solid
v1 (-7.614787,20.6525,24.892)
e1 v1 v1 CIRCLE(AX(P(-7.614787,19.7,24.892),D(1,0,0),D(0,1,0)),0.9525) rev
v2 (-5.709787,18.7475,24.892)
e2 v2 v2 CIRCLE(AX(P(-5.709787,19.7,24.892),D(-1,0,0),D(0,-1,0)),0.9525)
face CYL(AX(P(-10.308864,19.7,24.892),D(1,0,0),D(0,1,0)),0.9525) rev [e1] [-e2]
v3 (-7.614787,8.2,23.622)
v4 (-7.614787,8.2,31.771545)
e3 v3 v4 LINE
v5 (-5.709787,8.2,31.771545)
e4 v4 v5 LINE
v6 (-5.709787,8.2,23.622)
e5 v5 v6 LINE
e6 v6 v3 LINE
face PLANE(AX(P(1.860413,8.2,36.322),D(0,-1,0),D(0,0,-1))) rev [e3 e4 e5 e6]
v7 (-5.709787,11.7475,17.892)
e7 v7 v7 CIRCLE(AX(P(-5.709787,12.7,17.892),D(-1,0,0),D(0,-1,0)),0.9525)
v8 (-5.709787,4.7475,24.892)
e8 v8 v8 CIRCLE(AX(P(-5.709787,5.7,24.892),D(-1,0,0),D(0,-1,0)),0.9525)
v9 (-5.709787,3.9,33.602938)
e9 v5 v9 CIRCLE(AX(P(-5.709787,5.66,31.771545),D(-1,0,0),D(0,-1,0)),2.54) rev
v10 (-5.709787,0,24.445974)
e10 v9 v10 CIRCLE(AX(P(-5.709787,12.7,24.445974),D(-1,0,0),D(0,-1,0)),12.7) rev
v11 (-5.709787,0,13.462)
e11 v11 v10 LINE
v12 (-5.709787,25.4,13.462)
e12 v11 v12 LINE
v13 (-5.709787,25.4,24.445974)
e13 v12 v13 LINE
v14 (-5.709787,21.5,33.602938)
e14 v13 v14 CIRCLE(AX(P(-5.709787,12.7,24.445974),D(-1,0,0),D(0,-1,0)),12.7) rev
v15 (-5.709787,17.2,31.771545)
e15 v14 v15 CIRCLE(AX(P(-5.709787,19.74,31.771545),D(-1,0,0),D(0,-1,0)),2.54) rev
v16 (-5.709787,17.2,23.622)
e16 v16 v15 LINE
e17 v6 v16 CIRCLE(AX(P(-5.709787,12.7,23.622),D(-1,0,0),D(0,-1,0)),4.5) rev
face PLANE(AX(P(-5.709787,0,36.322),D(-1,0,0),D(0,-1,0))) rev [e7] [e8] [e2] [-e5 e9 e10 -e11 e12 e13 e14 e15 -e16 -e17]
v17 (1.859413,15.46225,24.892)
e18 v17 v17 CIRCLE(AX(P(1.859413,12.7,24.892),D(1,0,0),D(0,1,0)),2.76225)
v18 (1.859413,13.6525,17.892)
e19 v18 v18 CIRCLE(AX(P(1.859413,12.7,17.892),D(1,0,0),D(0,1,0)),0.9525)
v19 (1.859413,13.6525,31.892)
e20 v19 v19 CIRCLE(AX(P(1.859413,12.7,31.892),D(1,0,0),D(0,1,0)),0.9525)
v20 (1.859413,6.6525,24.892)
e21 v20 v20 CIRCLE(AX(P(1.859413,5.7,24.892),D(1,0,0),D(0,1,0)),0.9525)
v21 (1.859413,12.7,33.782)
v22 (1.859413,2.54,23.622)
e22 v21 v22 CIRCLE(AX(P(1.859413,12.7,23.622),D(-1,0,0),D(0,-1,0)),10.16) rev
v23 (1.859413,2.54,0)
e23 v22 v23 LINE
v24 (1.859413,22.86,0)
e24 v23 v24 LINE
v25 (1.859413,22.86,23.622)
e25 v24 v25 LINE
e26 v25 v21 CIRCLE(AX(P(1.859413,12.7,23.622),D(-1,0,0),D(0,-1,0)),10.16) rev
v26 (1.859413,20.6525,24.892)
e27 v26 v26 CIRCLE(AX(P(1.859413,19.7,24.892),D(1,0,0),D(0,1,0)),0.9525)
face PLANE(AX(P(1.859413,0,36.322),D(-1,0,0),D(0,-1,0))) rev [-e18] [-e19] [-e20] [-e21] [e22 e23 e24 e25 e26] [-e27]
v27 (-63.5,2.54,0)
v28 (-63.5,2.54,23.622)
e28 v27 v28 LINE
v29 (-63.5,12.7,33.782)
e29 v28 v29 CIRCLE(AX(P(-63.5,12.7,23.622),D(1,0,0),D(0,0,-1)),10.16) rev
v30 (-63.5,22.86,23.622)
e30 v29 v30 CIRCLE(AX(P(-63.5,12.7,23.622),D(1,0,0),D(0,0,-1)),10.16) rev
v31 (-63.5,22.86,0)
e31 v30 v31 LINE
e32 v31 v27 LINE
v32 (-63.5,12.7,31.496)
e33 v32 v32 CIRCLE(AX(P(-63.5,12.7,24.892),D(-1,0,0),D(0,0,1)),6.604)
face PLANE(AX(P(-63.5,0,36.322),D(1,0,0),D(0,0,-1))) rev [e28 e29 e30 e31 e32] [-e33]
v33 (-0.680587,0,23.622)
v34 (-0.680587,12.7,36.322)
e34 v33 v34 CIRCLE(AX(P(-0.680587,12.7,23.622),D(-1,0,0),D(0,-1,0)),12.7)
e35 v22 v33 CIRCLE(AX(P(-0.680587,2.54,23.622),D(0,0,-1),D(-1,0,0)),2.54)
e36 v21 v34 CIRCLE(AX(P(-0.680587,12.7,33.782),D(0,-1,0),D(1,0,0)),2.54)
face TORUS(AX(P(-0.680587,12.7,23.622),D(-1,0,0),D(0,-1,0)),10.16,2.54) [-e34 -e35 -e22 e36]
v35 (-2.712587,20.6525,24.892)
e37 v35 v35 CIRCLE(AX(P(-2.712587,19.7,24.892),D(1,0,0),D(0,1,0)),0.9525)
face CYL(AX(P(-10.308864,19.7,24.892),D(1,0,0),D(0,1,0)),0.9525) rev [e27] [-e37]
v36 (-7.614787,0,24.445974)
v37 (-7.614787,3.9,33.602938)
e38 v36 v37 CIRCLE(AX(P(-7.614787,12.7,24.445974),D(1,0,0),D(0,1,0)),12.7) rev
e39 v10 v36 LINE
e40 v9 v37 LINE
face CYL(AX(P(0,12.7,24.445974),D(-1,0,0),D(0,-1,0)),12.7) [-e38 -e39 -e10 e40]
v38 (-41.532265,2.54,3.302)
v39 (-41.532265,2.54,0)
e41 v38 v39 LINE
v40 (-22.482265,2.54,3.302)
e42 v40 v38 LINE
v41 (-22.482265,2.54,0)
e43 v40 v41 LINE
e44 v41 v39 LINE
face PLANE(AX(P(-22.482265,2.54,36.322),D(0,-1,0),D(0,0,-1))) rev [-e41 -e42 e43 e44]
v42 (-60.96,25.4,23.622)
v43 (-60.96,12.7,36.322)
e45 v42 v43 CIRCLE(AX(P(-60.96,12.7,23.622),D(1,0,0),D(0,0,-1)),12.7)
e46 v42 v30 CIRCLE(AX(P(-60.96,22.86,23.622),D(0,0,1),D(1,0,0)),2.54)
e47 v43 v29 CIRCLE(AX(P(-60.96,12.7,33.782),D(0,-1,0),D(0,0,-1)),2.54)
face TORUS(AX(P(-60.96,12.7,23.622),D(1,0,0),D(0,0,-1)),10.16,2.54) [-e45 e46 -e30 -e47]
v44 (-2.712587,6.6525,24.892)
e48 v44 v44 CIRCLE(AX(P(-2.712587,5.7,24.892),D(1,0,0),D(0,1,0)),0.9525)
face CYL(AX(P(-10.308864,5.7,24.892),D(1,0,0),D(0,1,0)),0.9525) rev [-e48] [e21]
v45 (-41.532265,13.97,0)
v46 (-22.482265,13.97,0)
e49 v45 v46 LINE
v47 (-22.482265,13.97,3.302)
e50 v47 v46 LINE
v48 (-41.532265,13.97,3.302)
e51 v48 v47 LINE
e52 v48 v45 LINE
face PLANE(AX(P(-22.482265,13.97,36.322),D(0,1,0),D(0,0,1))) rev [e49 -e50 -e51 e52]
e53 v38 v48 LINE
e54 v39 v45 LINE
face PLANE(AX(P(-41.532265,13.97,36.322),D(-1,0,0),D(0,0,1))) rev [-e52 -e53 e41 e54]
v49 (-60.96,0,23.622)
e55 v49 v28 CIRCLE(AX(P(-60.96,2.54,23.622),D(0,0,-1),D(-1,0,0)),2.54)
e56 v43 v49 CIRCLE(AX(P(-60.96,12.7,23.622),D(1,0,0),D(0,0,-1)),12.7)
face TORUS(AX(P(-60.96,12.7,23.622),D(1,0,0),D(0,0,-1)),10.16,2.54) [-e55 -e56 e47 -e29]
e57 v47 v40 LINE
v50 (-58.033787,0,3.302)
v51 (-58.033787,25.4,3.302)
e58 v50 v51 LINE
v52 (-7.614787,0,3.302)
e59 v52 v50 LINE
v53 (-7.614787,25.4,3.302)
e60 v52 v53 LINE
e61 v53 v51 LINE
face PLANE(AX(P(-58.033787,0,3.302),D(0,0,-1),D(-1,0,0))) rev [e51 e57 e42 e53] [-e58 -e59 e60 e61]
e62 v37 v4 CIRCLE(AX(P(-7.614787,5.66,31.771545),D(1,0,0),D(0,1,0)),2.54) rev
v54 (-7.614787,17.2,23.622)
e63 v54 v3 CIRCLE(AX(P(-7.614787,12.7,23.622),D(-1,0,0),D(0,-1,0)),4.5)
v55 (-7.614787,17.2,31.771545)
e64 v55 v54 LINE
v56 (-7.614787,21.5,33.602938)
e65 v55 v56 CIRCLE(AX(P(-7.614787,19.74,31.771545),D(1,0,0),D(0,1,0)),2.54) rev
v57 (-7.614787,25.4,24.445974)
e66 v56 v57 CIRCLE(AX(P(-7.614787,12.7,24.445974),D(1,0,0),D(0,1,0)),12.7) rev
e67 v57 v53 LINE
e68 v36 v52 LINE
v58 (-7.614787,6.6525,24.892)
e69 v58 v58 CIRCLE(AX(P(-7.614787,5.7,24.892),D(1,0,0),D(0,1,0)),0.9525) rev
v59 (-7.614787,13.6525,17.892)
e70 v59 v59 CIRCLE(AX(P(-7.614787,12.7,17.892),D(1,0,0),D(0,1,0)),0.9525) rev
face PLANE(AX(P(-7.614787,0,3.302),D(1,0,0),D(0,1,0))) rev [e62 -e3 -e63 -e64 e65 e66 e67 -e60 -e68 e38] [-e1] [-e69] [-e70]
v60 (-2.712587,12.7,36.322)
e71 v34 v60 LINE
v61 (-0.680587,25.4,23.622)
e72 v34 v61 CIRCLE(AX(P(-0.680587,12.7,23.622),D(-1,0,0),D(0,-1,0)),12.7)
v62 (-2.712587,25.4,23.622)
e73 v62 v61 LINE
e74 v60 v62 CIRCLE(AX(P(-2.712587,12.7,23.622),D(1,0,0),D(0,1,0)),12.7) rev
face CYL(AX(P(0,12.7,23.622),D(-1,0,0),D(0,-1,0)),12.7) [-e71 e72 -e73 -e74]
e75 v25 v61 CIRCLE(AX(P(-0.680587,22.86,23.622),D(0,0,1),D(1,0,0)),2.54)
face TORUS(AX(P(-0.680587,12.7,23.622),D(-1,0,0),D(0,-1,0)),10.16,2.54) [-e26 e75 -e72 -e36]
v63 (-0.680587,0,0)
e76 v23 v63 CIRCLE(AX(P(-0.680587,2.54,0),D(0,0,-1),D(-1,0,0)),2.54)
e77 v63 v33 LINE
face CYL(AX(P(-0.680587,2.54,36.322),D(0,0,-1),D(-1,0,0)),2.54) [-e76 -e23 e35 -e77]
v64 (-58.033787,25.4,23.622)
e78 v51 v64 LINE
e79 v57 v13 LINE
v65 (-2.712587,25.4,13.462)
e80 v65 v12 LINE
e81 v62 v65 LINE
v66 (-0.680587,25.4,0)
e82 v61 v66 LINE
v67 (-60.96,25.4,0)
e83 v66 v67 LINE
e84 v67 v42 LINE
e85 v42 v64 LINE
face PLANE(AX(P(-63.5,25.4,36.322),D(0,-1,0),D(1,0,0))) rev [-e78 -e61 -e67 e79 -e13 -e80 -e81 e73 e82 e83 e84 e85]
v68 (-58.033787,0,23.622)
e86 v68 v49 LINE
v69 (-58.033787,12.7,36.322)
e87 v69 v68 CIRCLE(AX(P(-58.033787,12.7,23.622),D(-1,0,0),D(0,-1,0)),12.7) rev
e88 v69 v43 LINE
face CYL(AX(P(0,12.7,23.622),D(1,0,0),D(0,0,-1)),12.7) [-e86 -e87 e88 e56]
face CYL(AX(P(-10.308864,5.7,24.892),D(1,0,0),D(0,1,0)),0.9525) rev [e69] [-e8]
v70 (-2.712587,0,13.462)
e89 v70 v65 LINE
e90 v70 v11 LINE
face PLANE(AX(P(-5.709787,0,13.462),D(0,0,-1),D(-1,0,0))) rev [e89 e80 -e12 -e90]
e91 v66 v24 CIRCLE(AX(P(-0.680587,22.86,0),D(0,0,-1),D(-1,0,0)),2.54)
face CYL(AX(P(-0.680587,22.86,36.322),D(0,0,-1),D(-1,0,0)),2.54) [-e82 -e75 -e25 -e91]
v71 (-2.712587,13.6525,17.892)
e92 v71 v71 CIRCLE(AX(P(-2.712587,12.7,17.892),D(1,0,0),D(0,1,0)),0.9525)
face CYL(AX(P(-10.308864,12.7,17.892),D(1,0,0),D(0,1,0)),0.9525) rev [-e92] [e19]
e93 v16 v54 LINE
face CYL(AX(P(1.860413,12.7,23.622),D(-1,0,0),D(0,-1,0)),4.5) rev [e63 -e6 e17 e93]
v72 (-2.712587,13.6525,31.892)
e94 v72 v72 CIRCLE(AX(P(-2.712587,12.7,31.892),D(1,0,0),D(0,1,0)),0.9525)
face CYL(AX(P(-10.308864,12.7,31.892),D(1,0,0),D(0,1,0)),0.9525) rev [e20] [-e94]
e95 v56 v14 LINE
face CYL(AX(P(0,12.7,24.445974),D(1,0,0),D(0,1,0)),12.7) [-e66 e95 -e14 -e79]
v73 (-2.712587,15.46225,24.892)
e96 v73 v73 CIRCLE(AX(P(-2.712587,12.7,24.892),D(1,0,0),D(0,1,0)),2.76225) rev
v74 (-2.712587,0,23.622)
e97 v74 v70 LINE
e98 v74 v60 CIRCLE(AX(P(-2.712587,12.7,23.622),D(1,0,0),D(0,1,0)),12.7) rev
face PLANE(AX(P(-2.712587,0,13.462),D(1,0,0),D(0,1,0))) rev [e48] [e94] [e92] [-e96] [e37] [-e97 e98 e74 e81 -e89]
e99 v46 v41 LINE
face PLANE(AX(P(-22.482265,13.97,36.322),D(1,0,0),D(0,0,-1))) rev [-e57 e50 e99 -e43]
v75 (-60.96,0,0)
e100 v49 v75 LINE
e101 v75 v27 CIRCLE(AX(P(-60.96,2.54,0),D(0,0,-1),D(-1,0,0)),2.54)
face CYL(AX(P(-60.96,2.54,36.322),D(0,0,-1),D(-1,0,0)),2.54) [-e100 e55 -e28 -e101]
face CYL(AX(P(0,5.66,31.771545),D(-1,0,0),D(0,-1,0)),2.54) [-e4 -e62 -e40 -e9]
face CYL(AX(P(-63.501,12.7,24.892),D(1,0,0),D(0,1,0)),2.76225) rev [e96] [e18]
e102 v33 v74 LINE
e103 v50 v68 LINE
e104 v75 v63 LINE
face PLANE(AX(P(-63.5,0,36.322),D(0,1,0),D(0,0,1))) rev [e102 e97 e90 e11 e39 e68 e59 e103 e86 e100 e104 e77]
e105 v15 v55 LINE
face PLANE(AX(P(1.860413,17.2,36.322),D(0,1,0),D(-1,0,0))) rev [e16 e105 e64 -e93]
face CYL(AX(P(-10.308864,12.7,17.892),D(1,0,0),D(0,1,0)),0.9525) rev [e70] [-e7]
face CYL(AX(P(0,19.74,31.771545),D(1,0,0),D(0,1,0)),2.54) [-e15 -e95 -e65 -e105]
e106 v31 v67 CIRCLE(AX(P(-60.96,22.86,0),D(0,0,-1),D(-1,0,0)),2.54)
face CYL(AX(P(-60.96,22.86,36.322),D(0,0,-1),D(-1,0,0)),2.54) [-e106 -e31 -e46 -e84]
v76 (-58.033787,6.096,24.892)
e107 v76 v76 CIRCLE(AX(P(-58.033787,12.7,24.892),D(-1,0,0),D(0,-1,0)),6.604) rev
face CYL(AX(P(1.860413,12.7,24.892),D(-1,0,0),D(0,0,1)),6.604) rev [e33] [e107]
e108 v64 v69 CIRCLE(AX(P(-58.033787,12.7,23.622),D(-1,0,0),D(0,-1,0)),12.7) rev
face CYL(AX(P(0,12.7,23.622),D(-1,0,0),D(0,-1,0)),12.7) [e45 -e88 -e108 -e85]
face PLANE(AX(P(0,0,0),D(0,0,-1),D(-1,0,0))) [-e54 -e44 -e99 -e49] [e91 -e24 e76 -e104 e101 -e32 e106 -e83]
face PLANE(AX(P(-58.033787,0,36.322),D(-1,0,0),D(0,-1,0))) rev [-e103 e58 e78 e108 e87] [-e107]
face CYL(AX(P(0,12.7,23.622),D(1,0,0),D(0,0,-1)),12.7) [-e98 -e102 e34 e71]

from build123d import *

# Parameters (mm, degrees)
SKETCH1_W           = 65.359412811
SKETCH1_H           = 25.4
BOSS_EXTRUDE1_DEPTH = 36.322
SKETCH4_W           = 50.419
SKETCH4_H           = 33.02
SKETCH4_W_2         = 2.9972
SKETCH4_H_2         = 22.86
CUT_EXTRUDE1_DEPTH  = 78.438347632
CUT_EXTRUDE2_REACH  = 80.97
SKETCH5_R           = 2.76225
CUT_EXTRUDE3_REACH  = 80.97
SKETCH6_R           = 0.9525
CUT_EXTRUDE5_REACH  = 80.97
SKETCH7_R           = 6.604
SKETCH7_R_2         = 0.9525
CUT_EXTRUDE6_REACH  = 73.327
FILLET1_R           = 12.7
FILLET2_R           = 2.54
SKETCH10_W          = 19.05
SKETCH10_H          = 11.43
CUT_EXTRUDE7_DEPTH  = 78.438347679


with BuildPart() as part:
    # Sketch1 → Boss-Extrude1 (new body)
    with BuildSketch(Plane.XY):
        with Locations((-30.820293595, 12.7)):
            Rectangle(SKETCH1_W, SKETCH1_H)
    extrude(amount=BOSS_EXTRUDE1_DEPTH)

    # Sketch4 → Cut-Extrude1 (cut, through all)
    with BuildSketch(Plane(origin=(0, 25.4, 0), x_dir=(1, 0, 0), z_dir=(0, 1, 0))):
        with Locations((-32.824287189, -19.812)):
            Rectangle(SKETCH4_W, SKETCH4_H)
        with Locations((-4.211187189, -24.892)):
            Rectangle(SKETCH4_W_2, SKETCH4_H_2)
    extrude(amount=-CUT_EXTRUDE1_DEPTH, mode=Mode.SUBTRACT)

    # Sketch5 → Cut-Extrude2 (cut, up to next)
    with BuildSketch(Plane(origin=(1.859412811, 0, 0), x_dir=(0, 0, -1), z_dir=(1, 0, 0)), mode=Mode.PRIVATE) as cut_extrude2_sk1:
        with Locations(Location((-24.892, 12.7, 0), (0, 0, 90))):
            Circle(SKETCH5_R)
    cut_extrude2_tool1 = extrude(cut_extrude2_sk1.sketch, amount=-CUT_EXTRUDE2_REACH, mode=Mode.PRIVATE) & part.part
    add(cut_extrude2_tool1.solids().sort_by_distance((1.859413, 12.7, 24.892))[0], mode=Mode.SUBTRACT)

    # Cut-Extrude3: up to this face of the body (flat: up to its plane)
    cut_extrude3_end = Plane(part.part.faces().sort_by_distance((-7.614787189, 12.7, 19.812))[0])
    # Sketch6 → Cut-Extrude3 (cut, up to the picked face)
    with BuildSketch(Plane(origin=(1.859412811, 0, 0), x_dir=(0, 0, -1), z_dir=(1, 0, 0)), mode=Mode.PRIVATE) as cut_extrude3_sk1:
        with Locations(Location((-24.892, 12.7, 0), (0, 0, 90))):
            Circle(SKETCH6_R)
    cut_extrude3_tool1 = split(extrude(cut_extrude3_sk1.sketch, amount=-CUT_EXTRUDE3_REACH, mode=Mode.PRIVATE), bisect_by=cut_extrude3_end, keep=Keep.BOTH, mode=Mode.PRIVATE)
    # Sketch6 → Cut-Extrude3 (cut, up to the picked face)
    with BuildSketch(Plane(origin=(1.859412811, 0, 0), x_dir=(0, 0, -1), z_dir=(1, 0, 0)), mode=Mode.PRIVATE) as cut_extrude3_sk2:
        with Locations(Location((-24.892, 19.7, 0), (0, 0, 90))):
            Circle(SKETCH6_R)
    cut_extrude3_tool2 = split(extrude(cut_extrude3_sk2.sketch, amount=-CUT_EXTRUDE3_REACH, mode=Mode.PRIVATE), bisect_by=cut_extrude3_end, keep=Keep.BOTH, mode=Mode.PRIVATE)
    # Sketch6 → Cut-Extrude3 (cut, up to the picked face)
    with BuildSketch(Plane(origin=(1.859412811, 0, 0), x_dir=(0, 0, -1), z_dir=(1, 0, 0)), mode=Mode.PRIVATE) as cut_extrude3_sk3:
        with Locations(Location((-17.892, 12.7, 0), (0, 0, 90))):
            Circle(SKETCH6_R)
    cut_extrude3_tool3 = split(extrude(cut_extrude3_sk3.sketch, amount=-CUT_EXTRUDE3_REACH, mode=Mode.PRIVATE), bisect_by=cut_extrude3_end, keep=Keep.BOTH, mode=Mode.PRIVATE)
    # Sketch6 → Cut-Extrude3 (cut, up to the picked face)
    with BuildSketch(Plane(origin=(1.859412811, 0, 0), x_dir=(0, 0, -1), z_dir=(1, 0, 0)), mode=Mode.PRIVATE) as cut_extrude3_sk4:
        with Locations(Location((-24.892, 5.7, 0), (0, 0, 90))):
            Circle(SKETCH6_R)
    cut_extrude3_tool4 = split(extrude(cut_extrude3_sk4.sketch, amount=-CUT_EXTRUDE3_REACH, mode=Mode.PRIVATE), bisect_by=cut_extrude3_end, keep=Keep.BOTH, mode=Mode.PRIVATE)
    # Sketch6 → Cut-Extrude3 (cut, up to the picked face)
    with BuildSketch(Plane(origin=(1.859412811, 0, 0), x_dir=(0, 0, -1), z_dir=(1, 0, 0)), mode=Mode.PRIVATE) as cut_extrude3_sk5:
        with Locations(Location((-31.892, 12.7, 0), (0, 0, 90))):
            Circle(SKETCH6_R)
    cut_extrude3_tool5 = split(extrude(cut_extrude3_sk5.sketch, amount=-CUT_EXTRUDE3_REACH, mode=Mode.PRIVATE), bisect_by=cut_extrude3_end, keep=Keep.BOTH, mode=Mode.PRIVATE)
    add(cut_extrude3_tool1.solids().sort_by(Axis((1.859413, 12.7, 24.892), (-1, 0, 0)))[0], mode=Mode.SUBTRACT)
    add(cut_extrude3_tool2.solids().sort_by(Axis((1.859413, 19.7, 24.892), (-1, 0, 0)))[0], mode=Mode.SUBTRACT)
    add(cut_extrude3_tool3.solids().sort_by(Axis((1.859413, 12.7, 17.892), (-1, 0, 0)))[0], mode=Mode.SUBTRACT)
    add(cut_extrude3_tool4.solids().sort_by(Axis((1.859413, 5.7, 24.892), (-1, 0, 0)))[0], mode=Mode.SUBTRACT)
    add(cut_extrude3_tool5.solids().sort_by(Axis((1.859413, 12.7, 31.892), (-1, 0, 0)))[0], mode=Mode.SUBTRACT)

    # Sketch7 → Cut-Extrude5 (cut, up to next)
    with BuildSketch(Plane.ZY.offset(63.5), mode=Mode.PRIVATE) as cut_extrude5_sk1:
        with Locations((24.892, 12.7)):
            Circle(SKETCH7_R)
        with Locations(Location((24.892, 12.7, 0), (0, 0, 90))):
            Circle(SKETCH7_R_2, mode=Mode.SUBTRACT)
    cut_extrude5_tool1 = extrude(cut_extrude5_sk1.sketch, amount=-CUT_EXTRUDE5_REACH, mode=Mode.PRIVATE) & part.part
    # Sketch7 → Cut-Extrude5 (cut, up to next)
    with BuildSketch(Plane.ZY.offset(63.5), mode=Mode.PRIVATE) as cut_extrude5_sk2:
        with Locations(Location((24.892, 12.7, 0), (0, 0, 90))):
            Circle(SKETCH7_R_2)
    cut_extrude5_tool2 = extrude(cut_extrude5_sk2.sketch, amount=-CUT_EXTRUDE5_REACH, mode=Mode.PRIVATE) & part.part
    add(cut_extrude5_tool1.solids().sort_by_distance((-63.5, 12.7, 18.474789))[0], mode=Mode.SUBTRACT)
    add(cut_extrude5_tool2.solids().sort_by_distance((-63.5, 12.7, 24.892))[0], mode=Mode.SUBTRACT)

    # Sketch8 → Cut-Extrude6 (cut, up to next)
    with BuildSketch(Plane.ZY.offset(7.614787189), mode=Mode.PRIVATE) as cut_extrude6_sk1:
        with BuildLine():
            Line((36.322, 17.2), (23.622, 17.2))
            ThreePointArc((23.622, 17.2), (19.122, 12.7), (23.622, 8.2))
            Line((23.622, 8.2), (36.322, 8.2))
            Line((36.322, 8.2), (36.322, 17.2))
        make_face()
    cut_extrude6_tool1 = extrude(cut_extrude6_sk1.sketch, amount=-CUT_EXTRUDE6_REACH, mode=Mode.PRIVATE) & part.part
    add(cut_extrude6_tool1.solids().sort_by_distance((-7.614787, 12.7, 28.173785))[0], mode=Mode.SUBTRACT)

    # Fillet1
    # the kernel refuses this fillet: 12.7 mm, written as the material it takes off along each edge
    with BuildSketch(Plane(origin=(-63.5, 0, 36.322), x_dir=(0, 0, -1), z_dir=(1, 0, 0))) as fillet1_piece_1:
        with BuildLine():
            CenterArc((FILLET1_R, FILLET1_R), FILLET1_R, 180, 90)
            Line((0, FILLET1_R), (-FILLET1_R * 0.02, FILLET1_R))
            Line((-FILLET1_R * 0.02, FILLET1_R), (-FILLET1_R * 0.02, -FILLET1_R * 0.02))
            Line((-FILLET1_R * 0.02, -FILLET1_R * 0.02), (FILLET1_R, -FILLET1_R * 0.02))
            Line((FILLET1_R, -FILLET1_R * 0.02), (FILLET1_R, 0))
        make_face()
    extrude(amount=5.466212811, mode=Mode.SUBTRACT)
    with BuildSketch(Plane(origin=(-7.614787189, 0, 36.322), x_dir=(0, 0, -1), z_dir=(1, 0, 0)), Plane(origin=(-5.709787189, 25.4, 36.322), x_dir=(0, 0, -1), z_dir=(-1, 0, 0))) as fillet1_piece_2:
        with BuildLine():
            CenterArc((11.876026271, 12.7), FILLET1_R, 200.752430643, 69.247569357)
            Line((0, 8.2), (-0.237520525, 8.11))
            ThreePointArc((-0.237520525, 8.11), (-0.254, 4.1), (-0.254, 0))
            Line((-0.254, 0), (0, -0.254))
            Line((0, -0.254), (11.876026271, -0.254))
            Line((11.876026271, -0.254), (11.876026271, 0))
        make_face()
    extrude(amount=1.905, mode=Mode.SUBTRACT)
    with BuildSketch(Plane(origin=(-2.712587189, 0, 36.322), x_dir=(0, 0, -1), z_dir=(1, 0, 0))) as fillet1_piece_3:
        with BuildLine():
            CenterArc((FILLET1_R, FILLET1_R), FILLET1_R, 180, 90)
            Line((0, FILLET1_R), (-FILLET1_R * 0.02, FILLET1_R))
            Line((-FILLET1_R * 0.02, FILLET1_R), (-FILLET1_R * 0.02, -FILLET1_R * 0.02))
            Line((-FILLET1_R * 0.02, -FILLET1_R * 0.02), (FILLET1_R, -FILLET1_R * 0.02))
            Line((FILLET1_R, -FILLET1_R * 0.02), (FILLET1_R, 0))
        make_face()
    extrude(amount=4.572, mode=Mode.SUBTRACT)
    with BuildSketch(Plane(origin=(1.859412811, 25.4, 36.322), x_dir=(0, -1, 0), z_dir=(-1, 0, 0))) as fillet1_piece_4:
        with BuildLine():
            CenterArc((FILLET1_R, -FILLET1_R), FILLET1_R, 90, 90)
            Line((0, -FILLET1_R), (-FILLET1_R * 0.02, -FILLET1_R))
            Line((-FILLET1_R * 0.02, -FILLET1_R), (-FILLET1_R * 0.02, FILLET1_R * 0.02))
            Line((-FILLET1_R * 0.02, FILLET1_R * 0.02), (FILLET1_R, FILLET1_R * 0.02))
            Line((FILLET1_R, FILLET1_R * 0.02), (FILLET1_R, 0))
        make_face()
    extrude(amount=4.572, mode=Mode.SUBTRACT)
    with BuildSketch(Plane(origin=(-58.033787189, 25.4, 36.322), x_dir=(0, -1, 0), z_dir=(-1, 0, 0))) as fillet1_piece_5:
        with BuildLine():
            CenterArc((FILLET1_R, -FILLET1_R), FILLET1_R, 90, 90)
            Line((0, -FILLET1_R), (-FILLET1_R * 0.02, -FILLET1_R))
            Line((-FILLET1_R * 0.02, -FILLET1_R), (-FILLET1_R * 0.02, FILLET1_R * 0.02))
            Line((-FILLET1_R * 0.02, FILLET1_R * 0.02), (FILLET1_R, FILLET1_R * 0.02))
            Line((FILLET1_R, FILLET1_R * 0.02), (FILLET1_R, 0))
        make_face()
    extrude(amount=5.466212811, mode=Mode.SUBTRACT)

    # Fillet2
    fillet2_edges = [part.edges().sort_by_distance(p)[0] for p in [
        (-6.662287189, 8.2, 36.322),
        (-6.662287189, 17.2, 36.322),
        (-63.5, 0, 11.811),
        (1.859412811, 0, 11.811),
        (-63.5, 25.4, 11.811),
        (-63.5, 21.680256121, 32.602256121),
        (-63.5, 3.719743879, 32.602256121),
        (1.859412811, 25.4, 11.811),
        (1.859412811, 21.680256121, 32.602256121),
        (1.859412811, 3.719743879, 32.602256121),
    ]]
    fillet(fillet2_edges, radius=FILLET2_R)

    # Sketch10 → Cut-Extrude7 (cut, through all)
    with BuildSketch(Plane(origin=(0, 0, 0), x_dir=(-1, 0, 0), z_dir=(0, 0, -1))):
        with Locations((32.007264904, 8.255)):
            Rectangle(SKETCH10_W, SKETCH10_H)
    extrude(amount=-CUT_EXTRUDE7_DEPTH, mode=Mode.SUBTRACT)


solid = part.part
